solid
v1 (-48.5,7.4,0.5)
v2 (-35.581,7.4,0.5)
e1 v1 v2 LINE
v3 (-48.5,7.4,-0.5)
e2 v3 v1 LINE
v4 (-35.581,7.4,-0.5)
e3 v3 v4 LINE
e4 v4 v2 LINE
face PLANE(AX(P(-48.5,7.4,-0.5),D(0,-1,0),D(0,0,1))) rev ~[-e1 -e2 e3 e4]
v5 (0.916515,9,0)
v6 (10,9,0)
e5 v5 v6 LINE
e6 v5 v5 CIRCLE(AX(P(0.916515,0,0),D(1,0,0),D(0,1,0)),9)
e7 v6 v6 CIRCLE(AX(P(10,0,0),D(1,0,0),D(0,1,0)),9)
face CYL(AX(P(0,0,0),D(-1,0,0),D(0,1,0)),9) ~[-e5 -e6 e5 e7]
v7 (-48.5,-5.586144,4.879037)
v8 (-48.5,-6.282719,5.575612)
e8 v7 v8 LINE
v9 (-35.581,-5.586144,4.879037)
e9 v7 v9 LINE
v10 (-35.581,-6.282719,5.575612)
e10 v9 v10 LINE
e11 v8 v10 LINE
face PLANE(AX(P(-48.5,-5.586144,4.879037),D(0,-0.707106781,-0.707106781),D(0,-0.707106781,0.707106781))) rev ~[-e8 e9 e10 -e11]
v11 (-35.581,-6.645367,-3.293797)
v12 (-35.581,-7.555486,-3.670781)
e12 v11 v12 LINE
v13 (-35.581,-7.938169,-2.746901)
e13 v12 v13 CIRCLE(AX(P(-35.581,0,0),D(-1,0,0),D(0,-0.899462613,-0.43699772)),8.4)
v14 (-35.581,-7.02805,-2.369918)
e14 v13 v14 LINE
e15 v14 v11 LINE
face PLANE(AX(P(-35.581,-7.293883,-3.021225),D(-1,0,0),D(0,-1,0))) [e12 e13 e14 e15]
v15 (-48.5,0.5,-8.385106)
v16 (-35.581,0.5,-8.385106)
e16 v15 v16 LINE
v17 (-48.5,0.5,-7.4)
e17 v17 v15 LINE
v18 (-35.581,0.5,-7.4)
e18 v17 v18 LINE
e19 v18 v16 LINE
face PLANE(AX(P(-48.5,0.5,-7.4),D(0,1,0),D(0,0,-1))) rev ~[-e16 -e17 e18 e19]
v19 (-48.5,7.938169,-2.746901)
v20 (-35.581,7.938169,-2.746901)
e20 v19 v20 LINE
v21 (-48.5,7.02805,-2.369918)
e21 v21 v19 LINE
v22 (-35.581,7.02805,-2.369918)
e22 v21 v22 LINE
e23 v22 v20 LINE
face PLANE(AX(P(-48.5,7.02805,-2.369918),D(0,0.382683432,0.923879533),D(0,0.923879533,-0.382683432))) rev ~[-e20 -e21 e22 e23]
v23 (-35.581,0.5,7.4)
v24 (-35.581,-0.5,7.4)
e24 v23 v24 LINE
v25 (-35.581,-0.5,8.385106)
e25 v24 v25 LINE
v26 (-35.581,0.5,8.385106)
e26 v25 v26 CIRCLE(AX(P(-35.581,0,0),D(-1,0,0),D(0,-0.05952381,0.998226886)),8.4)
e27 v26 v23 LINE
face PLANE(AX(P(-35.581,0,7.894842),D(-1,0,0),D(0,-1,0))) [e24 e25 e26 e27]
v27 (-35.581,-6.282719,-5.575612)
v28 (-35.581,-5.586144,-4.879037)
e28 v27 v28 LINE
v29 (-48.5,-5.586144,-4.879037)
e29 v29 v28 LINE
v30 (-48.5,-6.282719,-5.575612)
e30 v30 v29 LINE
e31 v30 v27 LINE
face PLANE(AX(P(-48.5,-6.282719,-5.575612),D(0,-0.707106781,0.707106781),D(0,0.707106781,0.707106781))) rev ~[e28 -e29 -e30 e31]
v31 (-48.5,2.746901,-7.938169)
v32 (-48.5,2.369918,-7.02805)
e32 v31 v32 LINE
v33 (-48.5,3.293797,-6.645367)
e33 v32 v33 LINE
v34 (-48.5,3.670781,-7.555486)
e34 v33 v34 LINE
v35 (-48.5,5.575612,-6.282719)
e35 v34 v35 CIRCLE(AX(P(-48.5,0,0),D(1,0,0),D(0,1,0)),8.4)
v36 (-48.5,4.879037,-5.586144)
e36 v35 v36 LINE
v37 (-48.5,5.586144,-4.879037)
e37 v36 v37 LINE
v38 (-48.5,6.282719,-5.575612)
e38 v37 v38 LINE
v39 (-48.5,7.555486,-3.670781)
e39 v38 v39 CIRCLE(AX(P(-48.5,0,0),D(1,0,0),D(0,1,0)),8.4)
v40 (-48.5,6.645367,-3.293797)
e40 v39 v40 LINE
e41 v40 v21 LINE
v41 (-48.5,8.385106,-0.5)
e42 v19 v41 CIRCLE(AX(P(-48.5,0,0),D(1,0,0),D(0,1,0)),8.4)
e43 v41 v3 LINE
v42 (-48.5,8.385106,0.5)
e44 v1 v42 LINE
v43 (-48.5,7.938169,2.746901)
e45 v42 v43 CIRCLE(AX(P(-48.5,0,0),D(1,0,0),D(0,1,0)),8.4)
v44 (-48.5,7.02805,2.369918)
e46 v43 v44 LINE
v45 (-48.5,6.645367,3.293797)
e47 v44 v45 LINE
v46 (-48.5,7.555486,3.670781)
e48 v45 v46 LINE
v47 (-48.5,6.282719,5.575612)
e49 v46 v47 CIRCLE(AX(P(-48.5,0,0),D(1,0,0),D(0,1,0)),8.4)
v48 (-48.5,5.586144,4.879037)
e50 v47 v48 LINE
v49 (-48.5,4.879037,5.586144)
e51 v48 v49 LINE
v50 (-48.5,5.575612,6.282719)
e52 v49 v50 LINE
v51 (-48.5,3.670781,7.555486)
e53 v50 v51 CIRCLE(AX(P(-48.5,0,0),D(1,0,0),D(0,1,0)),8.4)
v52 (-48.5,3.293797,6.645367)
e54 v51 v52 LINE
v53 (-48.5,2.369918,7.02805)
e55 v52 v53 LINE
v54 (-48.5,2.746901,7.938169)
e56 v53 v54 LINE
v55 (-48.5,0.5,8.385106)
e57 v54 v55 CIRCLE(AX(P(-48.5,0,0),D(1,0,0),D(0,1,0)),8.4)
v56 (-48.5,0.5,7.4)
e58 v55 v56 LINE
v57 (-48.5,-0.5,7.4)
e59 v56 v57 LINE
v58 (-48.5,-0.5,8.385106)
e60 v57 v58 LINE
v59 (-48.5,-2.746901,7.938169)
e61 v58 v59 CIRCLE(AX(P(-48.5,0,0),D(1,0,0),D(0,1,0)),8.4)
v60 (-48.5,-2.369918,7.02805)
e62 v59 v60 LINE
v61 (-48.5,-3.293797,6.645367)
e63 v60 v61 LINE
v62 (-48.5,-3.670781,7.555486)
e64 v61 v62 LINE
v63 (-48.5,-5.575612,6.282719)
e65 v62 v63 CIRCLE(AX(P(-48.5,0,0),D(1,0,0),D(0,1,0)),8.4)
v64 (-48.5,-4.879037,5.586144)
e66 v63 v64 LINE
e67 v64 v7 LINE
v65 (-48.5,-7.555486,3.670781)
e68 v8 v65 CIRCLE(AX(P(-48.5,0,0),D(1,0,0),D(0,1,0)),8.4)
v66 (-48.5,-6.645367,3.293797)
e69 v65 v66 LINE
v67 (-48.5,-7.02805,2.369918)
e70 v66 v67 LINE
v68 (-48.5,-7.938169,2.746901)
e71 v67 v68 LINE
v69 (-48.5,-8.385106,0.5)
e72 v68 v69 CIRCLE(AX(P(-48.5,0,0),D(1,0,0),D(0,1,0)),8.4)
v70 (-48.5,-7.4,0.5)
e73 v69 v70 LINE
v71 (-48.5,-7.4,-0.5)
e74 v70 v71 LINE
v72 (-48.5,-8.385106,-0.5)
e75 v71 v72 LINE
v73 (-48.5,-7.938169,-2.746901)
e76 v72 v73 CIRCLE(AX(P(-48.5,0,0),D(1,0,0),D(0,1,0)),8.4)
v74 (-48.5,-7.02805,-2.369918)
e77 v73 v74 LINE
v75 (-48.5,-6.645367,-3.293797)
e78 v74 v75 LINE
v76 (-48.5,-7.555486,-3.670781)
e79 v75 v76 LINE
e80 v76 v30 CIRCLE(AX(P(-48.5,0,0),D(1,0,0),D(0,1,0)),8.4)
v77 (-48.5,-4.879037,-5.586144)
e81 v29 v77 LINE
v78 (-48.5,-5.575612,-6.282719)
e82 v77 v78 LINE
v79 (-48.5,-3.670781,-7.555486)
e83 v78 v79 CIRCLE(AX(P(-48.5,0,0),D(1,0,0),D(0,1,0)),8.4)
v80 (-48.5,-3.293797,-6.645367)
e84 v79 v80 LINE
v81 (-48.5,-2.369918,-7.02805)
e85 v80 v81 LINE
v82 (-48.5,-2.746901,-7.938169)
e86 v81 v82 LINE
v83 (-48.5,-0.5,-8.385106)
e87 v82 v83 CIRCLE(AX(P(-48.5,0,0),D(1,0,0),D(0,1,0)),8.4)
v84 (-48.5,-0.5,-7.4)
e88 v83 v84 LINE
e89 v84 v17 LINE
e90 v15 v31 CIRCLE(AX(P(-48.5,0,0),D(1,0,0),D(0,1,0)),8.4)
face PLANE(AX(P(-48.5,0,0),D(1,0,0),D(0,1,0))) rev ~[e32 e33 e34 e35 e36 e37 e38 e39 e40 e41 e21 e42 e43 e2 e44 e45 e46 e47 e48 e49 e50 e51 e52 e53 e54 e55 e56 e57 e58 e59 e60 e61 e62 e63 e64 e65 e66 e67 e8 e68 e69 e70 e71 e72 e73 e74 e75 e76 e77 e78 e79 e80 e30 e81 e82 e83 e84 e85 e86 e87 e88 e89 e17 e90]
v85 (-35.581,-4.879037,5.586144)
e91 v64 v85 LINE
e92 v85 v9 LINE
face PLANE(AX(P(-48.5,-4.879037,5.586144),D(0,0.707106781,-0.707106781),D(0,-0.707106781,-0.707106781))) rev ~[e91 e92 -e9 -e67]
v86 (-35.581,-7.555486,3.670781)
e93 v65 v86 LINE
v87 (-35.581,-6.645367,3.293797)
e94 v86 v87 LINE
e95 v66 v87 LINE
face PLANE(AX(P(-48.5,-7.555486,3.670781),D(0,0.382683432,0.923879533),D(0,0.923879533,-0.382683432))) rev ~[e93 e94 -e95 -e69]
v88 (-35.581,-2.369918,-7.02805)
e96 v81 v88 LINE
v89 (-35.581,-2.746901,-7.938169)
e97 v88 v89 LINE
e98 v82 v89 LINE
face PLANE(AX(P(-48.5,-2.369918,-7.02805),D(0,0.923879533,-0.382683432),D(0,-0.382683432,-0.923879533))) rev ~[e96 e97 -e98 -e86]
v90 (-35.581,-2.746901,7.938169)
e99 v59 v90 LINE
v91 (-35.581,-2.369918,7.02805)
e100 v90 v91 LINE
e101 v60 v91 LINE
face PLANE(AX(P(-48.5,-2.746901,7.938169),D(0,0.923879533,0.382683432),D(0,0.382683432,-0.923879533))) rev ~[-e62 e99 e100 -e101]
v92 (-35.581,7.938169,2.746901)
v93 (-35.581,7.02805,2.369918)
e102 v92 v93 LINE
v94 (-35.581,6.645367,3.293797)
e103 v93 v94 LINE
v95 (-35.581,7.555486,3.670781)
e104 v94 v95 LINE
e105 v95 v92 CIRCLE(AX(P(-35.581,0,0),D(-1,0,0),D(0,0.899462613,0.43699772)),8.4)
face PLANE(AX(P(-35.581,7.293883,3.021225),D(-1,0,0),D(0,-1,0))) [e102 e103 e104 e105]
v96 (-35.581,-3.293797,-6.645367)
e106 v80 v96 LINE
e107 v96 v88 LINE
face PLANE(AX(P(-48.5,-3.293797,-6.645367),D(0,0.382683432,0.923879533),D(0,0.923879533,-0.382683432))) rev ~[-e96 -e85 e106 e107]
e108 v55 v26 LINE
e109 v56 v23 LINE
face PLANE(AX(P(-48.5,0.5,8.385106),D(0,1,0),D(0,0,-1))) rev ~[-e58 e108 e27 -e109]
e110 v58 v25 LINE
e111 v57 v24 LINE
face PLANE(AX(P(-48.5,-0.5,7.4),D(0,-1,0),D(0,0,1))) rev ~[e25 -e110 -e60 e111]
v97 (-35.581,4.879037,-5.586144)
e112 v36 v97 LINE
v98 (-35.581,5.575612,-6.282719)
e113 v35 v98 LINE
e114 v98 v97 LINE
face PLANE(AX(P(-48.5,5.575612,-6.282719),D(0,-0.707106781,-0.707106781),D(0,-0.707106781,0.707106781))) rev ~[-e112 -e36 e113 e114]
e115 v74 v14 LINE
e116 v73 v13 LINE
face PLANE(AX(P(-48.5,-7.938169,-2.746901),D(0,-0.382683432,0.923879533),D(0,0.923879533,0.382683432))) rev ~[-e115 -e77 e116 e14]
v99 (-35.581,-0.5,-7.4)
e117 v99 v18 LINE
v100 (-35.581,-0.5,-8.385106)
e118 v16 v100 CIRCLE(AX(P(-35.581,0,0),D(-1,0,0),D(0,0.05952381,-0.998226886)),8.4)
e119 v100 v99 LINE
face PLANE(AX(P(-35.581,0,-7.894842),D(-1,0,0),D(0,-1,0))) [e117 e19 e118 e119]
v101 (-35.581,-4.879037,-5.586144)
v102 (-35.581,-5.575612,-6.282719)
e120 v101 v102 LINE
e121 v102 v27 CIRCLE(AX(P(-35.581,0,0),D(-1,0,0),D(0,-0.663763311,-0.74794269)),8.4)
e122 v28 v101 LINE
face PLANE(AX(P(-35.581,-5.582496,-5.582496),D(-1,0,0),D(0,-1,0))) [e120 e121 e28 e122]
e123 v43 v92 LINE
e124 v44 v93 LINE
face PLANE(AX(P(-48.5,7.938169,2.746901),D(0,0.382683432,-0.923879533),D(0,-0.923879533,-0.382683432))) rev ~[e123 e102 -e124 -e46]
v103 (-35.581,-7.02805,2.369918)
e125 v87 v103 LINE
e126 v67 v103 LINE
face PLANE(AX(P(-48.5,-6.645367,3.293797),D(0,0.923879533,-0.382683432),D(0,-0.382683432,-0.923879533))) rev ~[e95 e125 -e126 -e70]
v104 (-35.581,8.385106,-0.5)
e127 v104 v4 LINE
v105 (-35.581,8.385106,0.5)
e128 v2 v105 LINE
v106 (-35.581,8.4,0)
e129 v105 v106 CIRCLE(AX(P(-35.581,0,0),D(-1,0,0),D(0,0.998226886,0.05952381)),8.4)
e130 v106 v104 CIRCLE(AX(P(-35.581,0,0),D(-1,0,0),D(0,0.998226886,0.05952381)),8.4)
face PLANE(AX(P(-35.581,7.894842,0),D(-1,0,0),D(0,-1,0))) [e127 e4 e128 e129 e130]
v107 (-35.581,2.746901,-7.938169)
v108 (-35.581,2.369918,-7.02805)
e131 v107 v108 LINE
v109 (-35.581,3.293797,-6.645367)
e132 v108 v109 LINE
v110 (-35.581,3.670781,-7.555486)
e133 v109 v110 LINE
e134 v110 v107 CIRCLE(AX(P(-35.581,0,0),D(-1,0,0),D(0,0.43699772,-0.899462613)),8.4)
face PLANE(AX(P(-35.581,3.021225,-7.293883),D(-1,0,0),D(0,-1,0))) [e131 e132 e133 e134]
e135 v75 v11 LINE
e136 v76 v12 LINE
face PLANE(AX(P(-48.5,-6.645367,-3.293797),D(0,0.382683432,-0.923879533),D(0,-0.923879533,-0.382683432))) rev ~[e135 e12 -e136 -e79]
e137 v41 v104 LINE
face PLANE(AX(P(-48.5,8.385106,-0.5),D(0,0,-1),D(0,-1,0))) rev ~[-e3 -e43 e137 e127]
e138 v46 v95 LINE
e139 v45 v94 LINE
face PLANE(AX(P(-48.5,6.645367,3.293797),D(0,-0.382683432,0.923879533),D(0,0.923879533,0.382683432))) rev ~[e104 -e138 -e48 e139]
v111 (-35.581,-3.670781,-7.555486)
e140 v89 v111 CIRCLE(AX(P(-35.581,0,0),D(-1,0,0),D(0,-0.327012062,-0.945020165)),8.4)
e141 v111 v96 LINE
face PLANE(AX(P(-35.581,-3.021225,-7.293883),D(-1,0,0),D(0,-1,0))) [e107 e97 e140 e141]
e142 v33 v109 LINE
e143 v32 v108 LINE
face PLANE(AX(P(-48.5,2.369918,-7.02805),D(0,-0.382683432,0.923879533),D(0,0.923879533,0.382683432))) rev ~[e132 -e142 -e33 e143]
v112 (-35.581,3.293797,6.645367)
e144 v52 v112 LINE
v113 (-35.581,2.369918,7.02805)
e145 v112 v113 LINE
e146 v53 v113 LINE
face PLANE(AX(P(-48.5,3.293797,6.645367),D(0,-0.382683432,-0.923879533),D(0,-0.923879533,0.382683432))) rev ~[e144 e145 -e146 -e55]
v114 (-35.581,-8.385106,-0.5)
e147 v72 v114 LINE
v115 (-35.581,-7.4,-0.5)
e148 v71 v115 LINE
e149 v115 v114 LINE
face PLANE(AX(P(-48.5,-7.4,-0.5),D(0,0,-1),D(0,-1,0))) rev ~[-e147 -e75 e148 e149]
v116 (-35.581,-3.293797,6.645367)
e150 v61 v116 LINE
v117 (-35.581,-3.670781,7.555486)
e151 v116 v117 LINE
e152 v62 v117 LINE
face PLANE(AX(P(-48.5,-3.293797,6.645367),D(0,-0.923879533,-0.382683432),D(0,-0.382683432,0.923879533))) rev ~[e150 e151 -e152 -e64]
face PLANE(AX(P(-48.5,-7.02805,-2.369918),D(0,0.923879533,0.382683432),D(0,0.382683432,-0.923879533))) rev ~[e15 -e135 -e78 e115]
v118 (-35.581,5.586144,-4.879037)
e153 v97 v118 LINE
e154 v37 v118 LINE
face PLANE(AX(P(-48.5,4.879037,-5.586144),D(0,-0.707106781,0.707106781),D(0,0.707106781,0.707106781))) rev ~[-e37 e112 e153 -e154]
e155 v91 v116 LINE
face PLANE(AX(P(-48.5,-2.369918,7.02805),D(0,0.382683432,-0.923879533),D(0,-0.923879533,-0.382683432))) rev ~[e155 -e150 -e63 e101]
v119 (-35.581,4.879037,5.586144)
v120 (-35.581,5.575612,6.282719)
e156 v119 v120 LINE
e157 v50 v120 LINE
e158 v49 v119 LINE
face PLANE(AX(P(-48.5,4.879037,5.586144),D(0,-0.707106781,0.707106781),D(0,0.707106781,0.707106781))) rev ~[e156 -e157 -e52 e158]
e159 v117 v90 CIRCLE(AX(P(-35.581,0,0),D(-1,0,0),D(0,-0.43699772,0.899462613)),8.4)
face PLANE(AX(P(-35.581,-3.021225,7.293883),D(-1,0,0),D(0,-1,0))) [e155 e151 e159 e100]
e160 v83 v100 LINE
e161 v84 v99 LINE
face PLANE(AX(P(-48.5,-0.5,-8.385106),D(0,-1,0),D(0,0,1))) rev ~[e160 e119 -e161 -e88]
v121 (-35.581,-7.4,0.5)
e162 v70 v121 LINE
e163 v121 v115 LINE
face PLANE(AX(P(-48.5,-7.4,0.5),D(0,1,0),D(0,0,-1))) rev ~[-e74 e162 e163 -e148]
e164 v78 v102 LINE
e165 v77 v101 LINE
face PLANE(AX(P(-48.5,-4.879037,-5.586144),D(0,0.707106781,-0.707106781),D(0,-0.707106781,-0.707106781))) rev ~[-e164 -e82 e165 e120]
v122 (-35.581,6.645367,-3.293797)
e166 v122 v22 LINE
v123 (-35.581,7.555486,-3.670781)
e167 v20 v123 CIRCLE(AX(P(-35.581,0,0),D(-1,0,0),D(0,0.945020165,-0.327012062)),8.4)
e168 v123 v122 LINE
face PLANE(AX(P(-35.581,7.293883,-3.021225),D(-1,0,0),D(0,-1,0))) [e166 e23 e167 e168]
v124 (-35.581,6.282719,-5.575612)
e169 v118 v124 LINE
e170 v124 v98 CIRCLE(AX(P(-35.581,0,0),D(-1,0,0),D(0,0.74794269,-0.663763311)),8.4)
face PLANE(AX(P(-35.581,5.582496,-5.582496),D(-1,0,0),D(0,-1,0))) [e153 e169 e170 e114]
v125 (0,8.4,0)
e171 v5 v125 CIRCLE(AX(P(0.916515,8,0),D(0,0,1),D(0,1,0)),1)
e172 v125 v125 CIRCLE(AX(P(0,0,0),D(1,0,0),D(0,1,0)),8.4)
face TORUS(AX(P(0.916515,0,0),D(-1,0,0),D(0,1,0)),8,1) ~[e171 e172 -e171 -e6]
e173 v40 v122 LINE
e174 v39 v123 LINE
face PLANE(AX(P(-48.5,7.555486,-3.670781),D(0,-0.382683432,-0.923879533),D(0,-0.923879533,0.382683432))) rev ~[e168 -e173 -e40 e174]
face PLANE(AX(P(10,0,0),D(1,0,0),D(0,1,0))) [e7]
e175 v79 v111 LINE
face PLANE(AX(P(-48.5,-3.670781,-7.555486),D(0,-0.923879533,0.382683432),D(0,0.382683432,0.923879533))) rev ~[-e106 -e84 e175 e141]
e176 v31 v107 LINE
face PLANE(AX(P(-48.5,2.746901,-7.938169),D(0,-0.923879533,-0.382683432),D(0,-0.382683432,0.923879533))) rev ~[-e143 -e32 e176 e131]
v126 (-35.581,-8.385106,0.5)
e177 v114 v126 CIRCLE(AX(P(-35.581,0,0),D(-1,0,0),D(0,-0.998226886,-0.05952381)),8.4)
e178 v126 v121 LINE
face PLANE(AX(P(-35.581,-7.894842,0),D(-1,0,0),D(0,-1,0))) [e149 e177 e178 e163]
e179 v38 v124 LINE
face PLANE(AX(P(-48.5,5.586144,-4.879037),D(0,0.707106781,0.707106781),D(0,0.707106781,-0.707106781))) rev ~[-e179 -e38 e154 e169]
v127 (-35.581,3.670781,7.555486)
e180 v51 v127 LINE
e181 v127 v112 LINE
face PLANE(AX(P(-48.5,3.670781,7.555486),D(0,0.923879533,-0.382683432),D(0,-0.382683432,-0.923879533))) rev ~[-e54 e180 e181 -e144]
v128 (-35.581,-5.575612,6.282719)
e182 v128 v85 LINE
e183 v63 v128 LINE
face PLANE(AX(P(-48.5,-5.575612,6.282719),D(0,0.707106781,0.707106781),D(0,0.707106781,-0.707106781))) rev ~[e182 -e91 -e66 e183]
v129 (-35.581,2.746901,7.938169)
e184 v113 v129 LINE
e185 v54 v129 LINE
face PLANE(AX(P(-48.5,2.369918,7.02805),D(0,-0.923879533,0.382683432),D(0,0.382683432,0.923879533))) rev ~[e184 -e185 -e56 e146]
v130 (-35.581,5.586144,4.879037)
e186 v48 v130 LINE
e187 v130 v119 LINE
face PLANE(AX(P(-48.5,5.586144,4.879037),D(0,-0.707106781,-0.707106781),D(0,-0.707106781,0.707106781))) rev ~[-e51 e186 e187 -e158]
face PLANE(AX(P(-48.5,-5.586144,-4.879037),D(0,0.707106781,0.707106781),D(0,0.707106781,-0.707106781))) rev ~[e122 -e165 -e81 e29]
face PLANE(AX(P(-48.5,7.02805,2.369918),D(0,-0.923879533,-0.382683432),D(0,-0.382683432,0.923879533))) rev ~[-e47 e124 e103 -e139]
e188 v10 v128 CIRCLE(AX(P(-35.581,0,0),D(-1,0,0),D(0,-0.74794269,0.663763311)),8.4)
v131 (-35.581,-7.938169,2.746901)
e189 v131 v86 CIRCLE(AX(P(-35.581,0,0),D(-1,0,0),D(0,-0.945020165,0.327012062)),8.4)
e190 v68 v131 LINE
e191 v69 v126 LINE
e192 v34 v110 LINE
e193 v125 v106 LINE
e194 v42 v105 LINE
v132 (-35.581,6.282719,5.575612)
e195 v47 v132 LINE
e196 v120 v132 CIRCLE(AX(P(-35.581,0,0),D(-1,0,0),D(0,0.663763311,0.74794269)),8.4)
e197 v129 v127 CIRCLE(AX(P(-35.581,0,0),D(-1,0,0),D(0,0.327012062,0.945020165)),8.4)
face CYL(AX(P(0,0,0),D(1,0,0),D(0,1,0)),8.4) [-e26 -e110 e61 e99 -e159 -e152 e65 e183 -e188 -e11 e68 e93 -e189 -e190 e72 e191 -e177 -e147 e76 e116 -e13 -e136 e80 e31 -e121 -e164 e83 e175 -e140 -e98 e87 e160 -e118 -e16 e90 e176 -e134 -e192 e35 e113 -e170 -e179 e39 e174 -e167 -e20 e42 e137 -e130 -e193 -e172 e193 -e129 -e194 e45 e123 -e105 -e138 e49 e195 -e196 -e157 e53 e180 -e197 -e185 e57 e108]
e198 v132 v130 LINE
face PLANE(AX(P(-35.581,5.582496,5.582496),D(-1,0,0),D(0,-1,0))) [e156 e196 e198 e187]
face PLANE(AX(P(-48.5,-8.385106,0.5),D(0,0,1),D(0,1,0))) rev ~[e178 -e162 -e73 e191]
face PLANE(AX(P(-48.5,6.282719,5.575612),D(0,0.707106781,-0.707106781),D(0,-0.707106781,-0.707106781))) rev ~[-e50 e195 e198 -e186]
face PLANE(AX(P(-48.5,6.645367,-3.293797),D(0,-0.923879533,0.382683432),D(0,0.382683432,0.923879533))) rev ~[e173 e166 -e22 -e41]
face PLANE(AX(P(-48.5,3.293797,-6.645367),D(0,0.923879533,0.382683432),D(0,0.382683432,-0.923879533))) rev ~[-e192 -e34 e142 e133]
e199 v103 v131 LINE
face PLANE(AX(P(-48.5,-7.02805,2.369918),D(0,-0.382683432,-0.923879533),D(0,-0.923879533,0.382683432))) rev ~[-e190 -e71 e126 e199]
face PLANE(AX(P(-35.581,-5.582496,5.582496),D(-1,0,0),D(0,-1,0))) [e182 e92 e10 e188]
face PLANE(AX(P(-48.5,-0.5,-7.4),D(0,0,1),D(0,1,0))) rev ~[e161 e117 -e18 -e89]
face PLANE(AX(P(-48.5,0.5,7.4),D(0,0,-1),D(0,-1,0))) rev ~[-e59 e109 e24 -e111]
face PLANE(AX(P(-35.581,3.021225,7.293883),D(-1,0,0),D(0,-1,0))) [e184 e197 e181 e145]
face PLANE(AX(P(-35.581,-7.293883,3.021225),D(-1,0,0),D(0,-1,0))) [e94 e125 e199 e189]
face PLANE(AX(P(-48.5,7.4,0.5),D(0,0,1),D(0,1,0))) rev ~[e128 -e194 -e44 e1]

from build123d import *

# Parameters (mm, degrees)
F0_R     = 9
F1_DEPTH = 10
F2_R     = 8.4
F3_DEPTH = 48.5
F6_DEPTH = 12.919


# Not quite as in the source:
# - a fillet or chamfer that OpenCascade refuses, or shapes differently, is made with other operations: its cross-section is extruded or revolved along the edge and cut away or added


with BuildPart() as f1:
    # F0 (on Right) → F1 (new body)
    with BuildSketch(Plane.YZ):
        Circle(F0_R)
    extrude(amount=F1_DEPTH)

    # F2 (on Right) → F3 (join)
    with BuildSketch(Plane.YZ):
        Circle(F2_R)
    extrude(amount=-F3_DEPTH)

    # F4: fillet of radius 1 on 1 edges, made by hand

    # F4_s1 → F4_t2 (revolve, cut)
    with BuildSketch(Plane.XY):
        with BuildLine():
            ThreePointArc((0.916515139, 9), (0.3687925815, 8.8366600265), (0, 8.4))
            Line((0, 8.4), (0, 9))
            Line((0, 9), (0.916515139, 9))
        make_face()
    revolve(axis=Axis((0, 0, 0), (1, 0, 0)), mode=Mode.SUBTRACT)

    # F5 (on face) → F6 (cut)
    with BuildSketch(Plane(origin=(-48.5, 0, 0), x_dir=(0, -1, 0), z_dir=(-1, 0, 0))):
        with BuildLine():
            Line((0.5, 7.4), (0.5, 8.3851058431))
            ThreePointArc((0.5, 8.3851058431), (0, 8.4), (-0.5, 8.3851058431))
            Line((-0.5, 8.3851058431), (-0.5, 7.4))
            Line((-0.5, 7.4), (0.5, 7.4))
        make_face()
        with BuildLine():
            Line((-2.3699176332, 7.0280502568), (-2.7469013185, 7.9381693826))
            ThreePointArc((-2.7469013185, 7.9381693826), (-3.2145408319, 7.7605880731), (-3.670780851, 7.5554859502))
            Line((-3.670780851, 7.5554859502), (-3.2937971658, 6.6453668244))
            Line((-3.2937971658, 6.6453668244), (-2.3699176332, 7.0280502568))
        make_face()
        with BuildLine():
            Line((-4.8790367902, 5.5861435714), (-5.575611812, 6.2827185932))
            ThreePointArc((-5.575611812, 6.2827185932), (-5.939696962, 5.939696962), (-6.2827185932, 5.575611812))
            Line((-6.2827185932, 5.575611812), (-5.5861435714, 4.8790367902))
            Line((-5.5861435714, 4.8790367902), (-4.8790367902, 5.5861435714))
        make_face()
        with BuildLine():
            Line((-6.6453668244, 3.2937971658), (-7.5554859502, 3.670780851))
            ThreePointArc((-7.5554859502, 3.670780851), (-7.7605880731, 3.2145408319), (-7.9381693826, 2.7469013185))
            Line((-7.9381693826, 2.7469013185), (-7.0280502568, 2.3699176332))
            Line((-7.0280502568, 2.3699176332), (-6.6453668244, 3.2937971658))
        make_face()
        with BuildLine():
            Line((-7.4, 0.5), (-8.3851058431, 0.5))
            ThreePointArc((-8.3851058431, 0.5), (-8.4, 0), (-8.3851058431, -0.5))
            Line((-8.3851058431, -0.5), (-7.4, -0.5))
            Line((-7.4, -0.5), (-7.4, 0.5))
        make_face()
        with BuildLine():
            Line((-7.0280502568, -2.3699176332), (-7.9381693826, -2.7469013185))
            ThreePointArc((-7.9381693826, -2.7469013185), (-7.7605880731, -3.2145408319), (-7.5554859502, -3.670780851))
            Line((-7.5554859502, -3.670780851), (-6.6453668244, -3.2937971658))
            Line((-6.6453668244, -3.2937971658), (-7.0280502568, -2.3699176332))
        make_face()
        with BuildLine():
            Line((-5.5861435714, -4.8790367902), (-6.2827185932, -5.575611812))
            ThreePointArc((-6.2827185932, -5.575611812), (-5.939696962, -5.939696962), (-5.575611812, -6.2827185932))
            Line((-5.575611812, -6.2827185932), (-4.8790367902, -5.5861435714))
            Line((-4.8790367902, -5.5861435714), (-5.5861435714, -4.8790367902))
        make_face()
        with BuildLine():
            Line((-3.2937971658, -6.6453668244), (-3.670780851, -7.5554859502))
            ThreePointArc((-3.670780851, -7.5554859502), (-3.2145408319, -7.7605880731), (-2.7469013185, -7.9381693826))
            Line((-2.7469013185, -7.9381693826), (-2.3699176332, -7.0280502568))
            Line((-2.3699176332, -7.0280502568), (-3.2937971658, -6.6453668244))
        make_face()
        with BuildLine():
            Line((-0.5, -7.4), (-0.5, -8.3851058431))
            ThreePointArc((-0.5, -8.3851058431), (0, -8.4), (0.5, -8.3851058431))
            Line((0.5, -8.3851058431), (0.5, -7.4))
            Line((0.5, -7.4), (-0.5, -7.4))
        make_face()
        with BuildLine():
            Line((2.3699176332, -7.0280502568), (2.7469013185, -7.9381693826))
            ThreePointArc((2.7469013185, -7.9381693826), (3.2145408319, -7.7605880731), (3.670780851, -7.5554859502))
            Line((3.670780851, -7.5554859502), (3.2937971658, -6.6453668244))
            Line((3.2937971658, -6.6453668244), (2.3699176332, -7.0280502568))
        make_face()
        with BuildLine():
            Line((4.8790367902, -5.5861435714), (5.575611812, -6.2827185932))
            ThreePointArc((5.575611812, -6.2827185932), (5.939696962, -5.939696962), (6.2827185932, -5.575611812))
            Line((6.2827185932, -5.575611812), (5.5861435714, -4.8790367902))
            Line((5.5861435714, -4.8790367902), (4.8790367902, -5.5861435714))
        make_face()
        with BuildLine():
            Line((6.6453668244, -3.2937971658), (7.5554859502, -3.670780851))
            ThreePointArc((7.5554859502, -3.670780851), (7.7605880731, -3.2145408319), (7.9381693826, -2.7469013185))
            Line((7.9381693826, -2.7469013185), (7.0280502568, -2.3699176332))
            Line((7.0280502568, -2.3699176332), (6.6453668244, -3.2937971658))
        make_face()
        with BuildLine():
            Line((7.4, -0.5), (8.3851058431, -0.5))
            ThreePointArc((8.3851058431, -0.5), (8.4, 0), (8.3851058431, 0.5))
            Line((8.3851058431, 0.5), (7.4, 0.5))
            Line((7.4, 0.5), (7.4, -0.5))
        make_face()
        with BuildLine():
            Line((7.0280502568, 2.3699176332), (7.9381693826, 2.7469013185))
            ThreePointArc((7.9381693826, 2.7469013185), (7.7605880731, 3.2145408319), (7.5554859502, 3.670780851))
            Line((7.5554859502, 3.670780851), (6.6453668244, 3.2937971658))
            Line((6.6453668244, 3.2937971658), (7.0280502568, 2.3699176332))
        make_face()
        with BuildLine():
            Line((5.5861435714, 4.8790367902), (6.2827185932, 5.575611812))
            ThreePointArc((6.2827185932, 5.575611812), (5.939696962, 5.939696962), (5.575611812, 6.2827185932))
            Line((5.575611812, 6.2827185932), (4.8790367902, 5.5861435714))
            Line((4.8790367902, 5.5861435714), (5.5861435714, 4.8790367902))
        make_face()
        with BuildLine():
            Line((3.2937971658, 6.6453668244), (3.670780851, 7.5554859502))
            ThreePointArc((3.670780851, 7.5554859502), (3.2145408319, 7.7605880731), (2.7469013185, 7.9381693826))
            Line((2.7469013185, 7.9381693826), (2.3699176332, 7.0280502568))
            Line((2.3699176332, 7.0280502568), (3.2937971658, 6.6453668244))
        make_face()
    extrude(amount=-F6_DEPTH, mode=Mode.SUBTRACT)


solid = f1.part
